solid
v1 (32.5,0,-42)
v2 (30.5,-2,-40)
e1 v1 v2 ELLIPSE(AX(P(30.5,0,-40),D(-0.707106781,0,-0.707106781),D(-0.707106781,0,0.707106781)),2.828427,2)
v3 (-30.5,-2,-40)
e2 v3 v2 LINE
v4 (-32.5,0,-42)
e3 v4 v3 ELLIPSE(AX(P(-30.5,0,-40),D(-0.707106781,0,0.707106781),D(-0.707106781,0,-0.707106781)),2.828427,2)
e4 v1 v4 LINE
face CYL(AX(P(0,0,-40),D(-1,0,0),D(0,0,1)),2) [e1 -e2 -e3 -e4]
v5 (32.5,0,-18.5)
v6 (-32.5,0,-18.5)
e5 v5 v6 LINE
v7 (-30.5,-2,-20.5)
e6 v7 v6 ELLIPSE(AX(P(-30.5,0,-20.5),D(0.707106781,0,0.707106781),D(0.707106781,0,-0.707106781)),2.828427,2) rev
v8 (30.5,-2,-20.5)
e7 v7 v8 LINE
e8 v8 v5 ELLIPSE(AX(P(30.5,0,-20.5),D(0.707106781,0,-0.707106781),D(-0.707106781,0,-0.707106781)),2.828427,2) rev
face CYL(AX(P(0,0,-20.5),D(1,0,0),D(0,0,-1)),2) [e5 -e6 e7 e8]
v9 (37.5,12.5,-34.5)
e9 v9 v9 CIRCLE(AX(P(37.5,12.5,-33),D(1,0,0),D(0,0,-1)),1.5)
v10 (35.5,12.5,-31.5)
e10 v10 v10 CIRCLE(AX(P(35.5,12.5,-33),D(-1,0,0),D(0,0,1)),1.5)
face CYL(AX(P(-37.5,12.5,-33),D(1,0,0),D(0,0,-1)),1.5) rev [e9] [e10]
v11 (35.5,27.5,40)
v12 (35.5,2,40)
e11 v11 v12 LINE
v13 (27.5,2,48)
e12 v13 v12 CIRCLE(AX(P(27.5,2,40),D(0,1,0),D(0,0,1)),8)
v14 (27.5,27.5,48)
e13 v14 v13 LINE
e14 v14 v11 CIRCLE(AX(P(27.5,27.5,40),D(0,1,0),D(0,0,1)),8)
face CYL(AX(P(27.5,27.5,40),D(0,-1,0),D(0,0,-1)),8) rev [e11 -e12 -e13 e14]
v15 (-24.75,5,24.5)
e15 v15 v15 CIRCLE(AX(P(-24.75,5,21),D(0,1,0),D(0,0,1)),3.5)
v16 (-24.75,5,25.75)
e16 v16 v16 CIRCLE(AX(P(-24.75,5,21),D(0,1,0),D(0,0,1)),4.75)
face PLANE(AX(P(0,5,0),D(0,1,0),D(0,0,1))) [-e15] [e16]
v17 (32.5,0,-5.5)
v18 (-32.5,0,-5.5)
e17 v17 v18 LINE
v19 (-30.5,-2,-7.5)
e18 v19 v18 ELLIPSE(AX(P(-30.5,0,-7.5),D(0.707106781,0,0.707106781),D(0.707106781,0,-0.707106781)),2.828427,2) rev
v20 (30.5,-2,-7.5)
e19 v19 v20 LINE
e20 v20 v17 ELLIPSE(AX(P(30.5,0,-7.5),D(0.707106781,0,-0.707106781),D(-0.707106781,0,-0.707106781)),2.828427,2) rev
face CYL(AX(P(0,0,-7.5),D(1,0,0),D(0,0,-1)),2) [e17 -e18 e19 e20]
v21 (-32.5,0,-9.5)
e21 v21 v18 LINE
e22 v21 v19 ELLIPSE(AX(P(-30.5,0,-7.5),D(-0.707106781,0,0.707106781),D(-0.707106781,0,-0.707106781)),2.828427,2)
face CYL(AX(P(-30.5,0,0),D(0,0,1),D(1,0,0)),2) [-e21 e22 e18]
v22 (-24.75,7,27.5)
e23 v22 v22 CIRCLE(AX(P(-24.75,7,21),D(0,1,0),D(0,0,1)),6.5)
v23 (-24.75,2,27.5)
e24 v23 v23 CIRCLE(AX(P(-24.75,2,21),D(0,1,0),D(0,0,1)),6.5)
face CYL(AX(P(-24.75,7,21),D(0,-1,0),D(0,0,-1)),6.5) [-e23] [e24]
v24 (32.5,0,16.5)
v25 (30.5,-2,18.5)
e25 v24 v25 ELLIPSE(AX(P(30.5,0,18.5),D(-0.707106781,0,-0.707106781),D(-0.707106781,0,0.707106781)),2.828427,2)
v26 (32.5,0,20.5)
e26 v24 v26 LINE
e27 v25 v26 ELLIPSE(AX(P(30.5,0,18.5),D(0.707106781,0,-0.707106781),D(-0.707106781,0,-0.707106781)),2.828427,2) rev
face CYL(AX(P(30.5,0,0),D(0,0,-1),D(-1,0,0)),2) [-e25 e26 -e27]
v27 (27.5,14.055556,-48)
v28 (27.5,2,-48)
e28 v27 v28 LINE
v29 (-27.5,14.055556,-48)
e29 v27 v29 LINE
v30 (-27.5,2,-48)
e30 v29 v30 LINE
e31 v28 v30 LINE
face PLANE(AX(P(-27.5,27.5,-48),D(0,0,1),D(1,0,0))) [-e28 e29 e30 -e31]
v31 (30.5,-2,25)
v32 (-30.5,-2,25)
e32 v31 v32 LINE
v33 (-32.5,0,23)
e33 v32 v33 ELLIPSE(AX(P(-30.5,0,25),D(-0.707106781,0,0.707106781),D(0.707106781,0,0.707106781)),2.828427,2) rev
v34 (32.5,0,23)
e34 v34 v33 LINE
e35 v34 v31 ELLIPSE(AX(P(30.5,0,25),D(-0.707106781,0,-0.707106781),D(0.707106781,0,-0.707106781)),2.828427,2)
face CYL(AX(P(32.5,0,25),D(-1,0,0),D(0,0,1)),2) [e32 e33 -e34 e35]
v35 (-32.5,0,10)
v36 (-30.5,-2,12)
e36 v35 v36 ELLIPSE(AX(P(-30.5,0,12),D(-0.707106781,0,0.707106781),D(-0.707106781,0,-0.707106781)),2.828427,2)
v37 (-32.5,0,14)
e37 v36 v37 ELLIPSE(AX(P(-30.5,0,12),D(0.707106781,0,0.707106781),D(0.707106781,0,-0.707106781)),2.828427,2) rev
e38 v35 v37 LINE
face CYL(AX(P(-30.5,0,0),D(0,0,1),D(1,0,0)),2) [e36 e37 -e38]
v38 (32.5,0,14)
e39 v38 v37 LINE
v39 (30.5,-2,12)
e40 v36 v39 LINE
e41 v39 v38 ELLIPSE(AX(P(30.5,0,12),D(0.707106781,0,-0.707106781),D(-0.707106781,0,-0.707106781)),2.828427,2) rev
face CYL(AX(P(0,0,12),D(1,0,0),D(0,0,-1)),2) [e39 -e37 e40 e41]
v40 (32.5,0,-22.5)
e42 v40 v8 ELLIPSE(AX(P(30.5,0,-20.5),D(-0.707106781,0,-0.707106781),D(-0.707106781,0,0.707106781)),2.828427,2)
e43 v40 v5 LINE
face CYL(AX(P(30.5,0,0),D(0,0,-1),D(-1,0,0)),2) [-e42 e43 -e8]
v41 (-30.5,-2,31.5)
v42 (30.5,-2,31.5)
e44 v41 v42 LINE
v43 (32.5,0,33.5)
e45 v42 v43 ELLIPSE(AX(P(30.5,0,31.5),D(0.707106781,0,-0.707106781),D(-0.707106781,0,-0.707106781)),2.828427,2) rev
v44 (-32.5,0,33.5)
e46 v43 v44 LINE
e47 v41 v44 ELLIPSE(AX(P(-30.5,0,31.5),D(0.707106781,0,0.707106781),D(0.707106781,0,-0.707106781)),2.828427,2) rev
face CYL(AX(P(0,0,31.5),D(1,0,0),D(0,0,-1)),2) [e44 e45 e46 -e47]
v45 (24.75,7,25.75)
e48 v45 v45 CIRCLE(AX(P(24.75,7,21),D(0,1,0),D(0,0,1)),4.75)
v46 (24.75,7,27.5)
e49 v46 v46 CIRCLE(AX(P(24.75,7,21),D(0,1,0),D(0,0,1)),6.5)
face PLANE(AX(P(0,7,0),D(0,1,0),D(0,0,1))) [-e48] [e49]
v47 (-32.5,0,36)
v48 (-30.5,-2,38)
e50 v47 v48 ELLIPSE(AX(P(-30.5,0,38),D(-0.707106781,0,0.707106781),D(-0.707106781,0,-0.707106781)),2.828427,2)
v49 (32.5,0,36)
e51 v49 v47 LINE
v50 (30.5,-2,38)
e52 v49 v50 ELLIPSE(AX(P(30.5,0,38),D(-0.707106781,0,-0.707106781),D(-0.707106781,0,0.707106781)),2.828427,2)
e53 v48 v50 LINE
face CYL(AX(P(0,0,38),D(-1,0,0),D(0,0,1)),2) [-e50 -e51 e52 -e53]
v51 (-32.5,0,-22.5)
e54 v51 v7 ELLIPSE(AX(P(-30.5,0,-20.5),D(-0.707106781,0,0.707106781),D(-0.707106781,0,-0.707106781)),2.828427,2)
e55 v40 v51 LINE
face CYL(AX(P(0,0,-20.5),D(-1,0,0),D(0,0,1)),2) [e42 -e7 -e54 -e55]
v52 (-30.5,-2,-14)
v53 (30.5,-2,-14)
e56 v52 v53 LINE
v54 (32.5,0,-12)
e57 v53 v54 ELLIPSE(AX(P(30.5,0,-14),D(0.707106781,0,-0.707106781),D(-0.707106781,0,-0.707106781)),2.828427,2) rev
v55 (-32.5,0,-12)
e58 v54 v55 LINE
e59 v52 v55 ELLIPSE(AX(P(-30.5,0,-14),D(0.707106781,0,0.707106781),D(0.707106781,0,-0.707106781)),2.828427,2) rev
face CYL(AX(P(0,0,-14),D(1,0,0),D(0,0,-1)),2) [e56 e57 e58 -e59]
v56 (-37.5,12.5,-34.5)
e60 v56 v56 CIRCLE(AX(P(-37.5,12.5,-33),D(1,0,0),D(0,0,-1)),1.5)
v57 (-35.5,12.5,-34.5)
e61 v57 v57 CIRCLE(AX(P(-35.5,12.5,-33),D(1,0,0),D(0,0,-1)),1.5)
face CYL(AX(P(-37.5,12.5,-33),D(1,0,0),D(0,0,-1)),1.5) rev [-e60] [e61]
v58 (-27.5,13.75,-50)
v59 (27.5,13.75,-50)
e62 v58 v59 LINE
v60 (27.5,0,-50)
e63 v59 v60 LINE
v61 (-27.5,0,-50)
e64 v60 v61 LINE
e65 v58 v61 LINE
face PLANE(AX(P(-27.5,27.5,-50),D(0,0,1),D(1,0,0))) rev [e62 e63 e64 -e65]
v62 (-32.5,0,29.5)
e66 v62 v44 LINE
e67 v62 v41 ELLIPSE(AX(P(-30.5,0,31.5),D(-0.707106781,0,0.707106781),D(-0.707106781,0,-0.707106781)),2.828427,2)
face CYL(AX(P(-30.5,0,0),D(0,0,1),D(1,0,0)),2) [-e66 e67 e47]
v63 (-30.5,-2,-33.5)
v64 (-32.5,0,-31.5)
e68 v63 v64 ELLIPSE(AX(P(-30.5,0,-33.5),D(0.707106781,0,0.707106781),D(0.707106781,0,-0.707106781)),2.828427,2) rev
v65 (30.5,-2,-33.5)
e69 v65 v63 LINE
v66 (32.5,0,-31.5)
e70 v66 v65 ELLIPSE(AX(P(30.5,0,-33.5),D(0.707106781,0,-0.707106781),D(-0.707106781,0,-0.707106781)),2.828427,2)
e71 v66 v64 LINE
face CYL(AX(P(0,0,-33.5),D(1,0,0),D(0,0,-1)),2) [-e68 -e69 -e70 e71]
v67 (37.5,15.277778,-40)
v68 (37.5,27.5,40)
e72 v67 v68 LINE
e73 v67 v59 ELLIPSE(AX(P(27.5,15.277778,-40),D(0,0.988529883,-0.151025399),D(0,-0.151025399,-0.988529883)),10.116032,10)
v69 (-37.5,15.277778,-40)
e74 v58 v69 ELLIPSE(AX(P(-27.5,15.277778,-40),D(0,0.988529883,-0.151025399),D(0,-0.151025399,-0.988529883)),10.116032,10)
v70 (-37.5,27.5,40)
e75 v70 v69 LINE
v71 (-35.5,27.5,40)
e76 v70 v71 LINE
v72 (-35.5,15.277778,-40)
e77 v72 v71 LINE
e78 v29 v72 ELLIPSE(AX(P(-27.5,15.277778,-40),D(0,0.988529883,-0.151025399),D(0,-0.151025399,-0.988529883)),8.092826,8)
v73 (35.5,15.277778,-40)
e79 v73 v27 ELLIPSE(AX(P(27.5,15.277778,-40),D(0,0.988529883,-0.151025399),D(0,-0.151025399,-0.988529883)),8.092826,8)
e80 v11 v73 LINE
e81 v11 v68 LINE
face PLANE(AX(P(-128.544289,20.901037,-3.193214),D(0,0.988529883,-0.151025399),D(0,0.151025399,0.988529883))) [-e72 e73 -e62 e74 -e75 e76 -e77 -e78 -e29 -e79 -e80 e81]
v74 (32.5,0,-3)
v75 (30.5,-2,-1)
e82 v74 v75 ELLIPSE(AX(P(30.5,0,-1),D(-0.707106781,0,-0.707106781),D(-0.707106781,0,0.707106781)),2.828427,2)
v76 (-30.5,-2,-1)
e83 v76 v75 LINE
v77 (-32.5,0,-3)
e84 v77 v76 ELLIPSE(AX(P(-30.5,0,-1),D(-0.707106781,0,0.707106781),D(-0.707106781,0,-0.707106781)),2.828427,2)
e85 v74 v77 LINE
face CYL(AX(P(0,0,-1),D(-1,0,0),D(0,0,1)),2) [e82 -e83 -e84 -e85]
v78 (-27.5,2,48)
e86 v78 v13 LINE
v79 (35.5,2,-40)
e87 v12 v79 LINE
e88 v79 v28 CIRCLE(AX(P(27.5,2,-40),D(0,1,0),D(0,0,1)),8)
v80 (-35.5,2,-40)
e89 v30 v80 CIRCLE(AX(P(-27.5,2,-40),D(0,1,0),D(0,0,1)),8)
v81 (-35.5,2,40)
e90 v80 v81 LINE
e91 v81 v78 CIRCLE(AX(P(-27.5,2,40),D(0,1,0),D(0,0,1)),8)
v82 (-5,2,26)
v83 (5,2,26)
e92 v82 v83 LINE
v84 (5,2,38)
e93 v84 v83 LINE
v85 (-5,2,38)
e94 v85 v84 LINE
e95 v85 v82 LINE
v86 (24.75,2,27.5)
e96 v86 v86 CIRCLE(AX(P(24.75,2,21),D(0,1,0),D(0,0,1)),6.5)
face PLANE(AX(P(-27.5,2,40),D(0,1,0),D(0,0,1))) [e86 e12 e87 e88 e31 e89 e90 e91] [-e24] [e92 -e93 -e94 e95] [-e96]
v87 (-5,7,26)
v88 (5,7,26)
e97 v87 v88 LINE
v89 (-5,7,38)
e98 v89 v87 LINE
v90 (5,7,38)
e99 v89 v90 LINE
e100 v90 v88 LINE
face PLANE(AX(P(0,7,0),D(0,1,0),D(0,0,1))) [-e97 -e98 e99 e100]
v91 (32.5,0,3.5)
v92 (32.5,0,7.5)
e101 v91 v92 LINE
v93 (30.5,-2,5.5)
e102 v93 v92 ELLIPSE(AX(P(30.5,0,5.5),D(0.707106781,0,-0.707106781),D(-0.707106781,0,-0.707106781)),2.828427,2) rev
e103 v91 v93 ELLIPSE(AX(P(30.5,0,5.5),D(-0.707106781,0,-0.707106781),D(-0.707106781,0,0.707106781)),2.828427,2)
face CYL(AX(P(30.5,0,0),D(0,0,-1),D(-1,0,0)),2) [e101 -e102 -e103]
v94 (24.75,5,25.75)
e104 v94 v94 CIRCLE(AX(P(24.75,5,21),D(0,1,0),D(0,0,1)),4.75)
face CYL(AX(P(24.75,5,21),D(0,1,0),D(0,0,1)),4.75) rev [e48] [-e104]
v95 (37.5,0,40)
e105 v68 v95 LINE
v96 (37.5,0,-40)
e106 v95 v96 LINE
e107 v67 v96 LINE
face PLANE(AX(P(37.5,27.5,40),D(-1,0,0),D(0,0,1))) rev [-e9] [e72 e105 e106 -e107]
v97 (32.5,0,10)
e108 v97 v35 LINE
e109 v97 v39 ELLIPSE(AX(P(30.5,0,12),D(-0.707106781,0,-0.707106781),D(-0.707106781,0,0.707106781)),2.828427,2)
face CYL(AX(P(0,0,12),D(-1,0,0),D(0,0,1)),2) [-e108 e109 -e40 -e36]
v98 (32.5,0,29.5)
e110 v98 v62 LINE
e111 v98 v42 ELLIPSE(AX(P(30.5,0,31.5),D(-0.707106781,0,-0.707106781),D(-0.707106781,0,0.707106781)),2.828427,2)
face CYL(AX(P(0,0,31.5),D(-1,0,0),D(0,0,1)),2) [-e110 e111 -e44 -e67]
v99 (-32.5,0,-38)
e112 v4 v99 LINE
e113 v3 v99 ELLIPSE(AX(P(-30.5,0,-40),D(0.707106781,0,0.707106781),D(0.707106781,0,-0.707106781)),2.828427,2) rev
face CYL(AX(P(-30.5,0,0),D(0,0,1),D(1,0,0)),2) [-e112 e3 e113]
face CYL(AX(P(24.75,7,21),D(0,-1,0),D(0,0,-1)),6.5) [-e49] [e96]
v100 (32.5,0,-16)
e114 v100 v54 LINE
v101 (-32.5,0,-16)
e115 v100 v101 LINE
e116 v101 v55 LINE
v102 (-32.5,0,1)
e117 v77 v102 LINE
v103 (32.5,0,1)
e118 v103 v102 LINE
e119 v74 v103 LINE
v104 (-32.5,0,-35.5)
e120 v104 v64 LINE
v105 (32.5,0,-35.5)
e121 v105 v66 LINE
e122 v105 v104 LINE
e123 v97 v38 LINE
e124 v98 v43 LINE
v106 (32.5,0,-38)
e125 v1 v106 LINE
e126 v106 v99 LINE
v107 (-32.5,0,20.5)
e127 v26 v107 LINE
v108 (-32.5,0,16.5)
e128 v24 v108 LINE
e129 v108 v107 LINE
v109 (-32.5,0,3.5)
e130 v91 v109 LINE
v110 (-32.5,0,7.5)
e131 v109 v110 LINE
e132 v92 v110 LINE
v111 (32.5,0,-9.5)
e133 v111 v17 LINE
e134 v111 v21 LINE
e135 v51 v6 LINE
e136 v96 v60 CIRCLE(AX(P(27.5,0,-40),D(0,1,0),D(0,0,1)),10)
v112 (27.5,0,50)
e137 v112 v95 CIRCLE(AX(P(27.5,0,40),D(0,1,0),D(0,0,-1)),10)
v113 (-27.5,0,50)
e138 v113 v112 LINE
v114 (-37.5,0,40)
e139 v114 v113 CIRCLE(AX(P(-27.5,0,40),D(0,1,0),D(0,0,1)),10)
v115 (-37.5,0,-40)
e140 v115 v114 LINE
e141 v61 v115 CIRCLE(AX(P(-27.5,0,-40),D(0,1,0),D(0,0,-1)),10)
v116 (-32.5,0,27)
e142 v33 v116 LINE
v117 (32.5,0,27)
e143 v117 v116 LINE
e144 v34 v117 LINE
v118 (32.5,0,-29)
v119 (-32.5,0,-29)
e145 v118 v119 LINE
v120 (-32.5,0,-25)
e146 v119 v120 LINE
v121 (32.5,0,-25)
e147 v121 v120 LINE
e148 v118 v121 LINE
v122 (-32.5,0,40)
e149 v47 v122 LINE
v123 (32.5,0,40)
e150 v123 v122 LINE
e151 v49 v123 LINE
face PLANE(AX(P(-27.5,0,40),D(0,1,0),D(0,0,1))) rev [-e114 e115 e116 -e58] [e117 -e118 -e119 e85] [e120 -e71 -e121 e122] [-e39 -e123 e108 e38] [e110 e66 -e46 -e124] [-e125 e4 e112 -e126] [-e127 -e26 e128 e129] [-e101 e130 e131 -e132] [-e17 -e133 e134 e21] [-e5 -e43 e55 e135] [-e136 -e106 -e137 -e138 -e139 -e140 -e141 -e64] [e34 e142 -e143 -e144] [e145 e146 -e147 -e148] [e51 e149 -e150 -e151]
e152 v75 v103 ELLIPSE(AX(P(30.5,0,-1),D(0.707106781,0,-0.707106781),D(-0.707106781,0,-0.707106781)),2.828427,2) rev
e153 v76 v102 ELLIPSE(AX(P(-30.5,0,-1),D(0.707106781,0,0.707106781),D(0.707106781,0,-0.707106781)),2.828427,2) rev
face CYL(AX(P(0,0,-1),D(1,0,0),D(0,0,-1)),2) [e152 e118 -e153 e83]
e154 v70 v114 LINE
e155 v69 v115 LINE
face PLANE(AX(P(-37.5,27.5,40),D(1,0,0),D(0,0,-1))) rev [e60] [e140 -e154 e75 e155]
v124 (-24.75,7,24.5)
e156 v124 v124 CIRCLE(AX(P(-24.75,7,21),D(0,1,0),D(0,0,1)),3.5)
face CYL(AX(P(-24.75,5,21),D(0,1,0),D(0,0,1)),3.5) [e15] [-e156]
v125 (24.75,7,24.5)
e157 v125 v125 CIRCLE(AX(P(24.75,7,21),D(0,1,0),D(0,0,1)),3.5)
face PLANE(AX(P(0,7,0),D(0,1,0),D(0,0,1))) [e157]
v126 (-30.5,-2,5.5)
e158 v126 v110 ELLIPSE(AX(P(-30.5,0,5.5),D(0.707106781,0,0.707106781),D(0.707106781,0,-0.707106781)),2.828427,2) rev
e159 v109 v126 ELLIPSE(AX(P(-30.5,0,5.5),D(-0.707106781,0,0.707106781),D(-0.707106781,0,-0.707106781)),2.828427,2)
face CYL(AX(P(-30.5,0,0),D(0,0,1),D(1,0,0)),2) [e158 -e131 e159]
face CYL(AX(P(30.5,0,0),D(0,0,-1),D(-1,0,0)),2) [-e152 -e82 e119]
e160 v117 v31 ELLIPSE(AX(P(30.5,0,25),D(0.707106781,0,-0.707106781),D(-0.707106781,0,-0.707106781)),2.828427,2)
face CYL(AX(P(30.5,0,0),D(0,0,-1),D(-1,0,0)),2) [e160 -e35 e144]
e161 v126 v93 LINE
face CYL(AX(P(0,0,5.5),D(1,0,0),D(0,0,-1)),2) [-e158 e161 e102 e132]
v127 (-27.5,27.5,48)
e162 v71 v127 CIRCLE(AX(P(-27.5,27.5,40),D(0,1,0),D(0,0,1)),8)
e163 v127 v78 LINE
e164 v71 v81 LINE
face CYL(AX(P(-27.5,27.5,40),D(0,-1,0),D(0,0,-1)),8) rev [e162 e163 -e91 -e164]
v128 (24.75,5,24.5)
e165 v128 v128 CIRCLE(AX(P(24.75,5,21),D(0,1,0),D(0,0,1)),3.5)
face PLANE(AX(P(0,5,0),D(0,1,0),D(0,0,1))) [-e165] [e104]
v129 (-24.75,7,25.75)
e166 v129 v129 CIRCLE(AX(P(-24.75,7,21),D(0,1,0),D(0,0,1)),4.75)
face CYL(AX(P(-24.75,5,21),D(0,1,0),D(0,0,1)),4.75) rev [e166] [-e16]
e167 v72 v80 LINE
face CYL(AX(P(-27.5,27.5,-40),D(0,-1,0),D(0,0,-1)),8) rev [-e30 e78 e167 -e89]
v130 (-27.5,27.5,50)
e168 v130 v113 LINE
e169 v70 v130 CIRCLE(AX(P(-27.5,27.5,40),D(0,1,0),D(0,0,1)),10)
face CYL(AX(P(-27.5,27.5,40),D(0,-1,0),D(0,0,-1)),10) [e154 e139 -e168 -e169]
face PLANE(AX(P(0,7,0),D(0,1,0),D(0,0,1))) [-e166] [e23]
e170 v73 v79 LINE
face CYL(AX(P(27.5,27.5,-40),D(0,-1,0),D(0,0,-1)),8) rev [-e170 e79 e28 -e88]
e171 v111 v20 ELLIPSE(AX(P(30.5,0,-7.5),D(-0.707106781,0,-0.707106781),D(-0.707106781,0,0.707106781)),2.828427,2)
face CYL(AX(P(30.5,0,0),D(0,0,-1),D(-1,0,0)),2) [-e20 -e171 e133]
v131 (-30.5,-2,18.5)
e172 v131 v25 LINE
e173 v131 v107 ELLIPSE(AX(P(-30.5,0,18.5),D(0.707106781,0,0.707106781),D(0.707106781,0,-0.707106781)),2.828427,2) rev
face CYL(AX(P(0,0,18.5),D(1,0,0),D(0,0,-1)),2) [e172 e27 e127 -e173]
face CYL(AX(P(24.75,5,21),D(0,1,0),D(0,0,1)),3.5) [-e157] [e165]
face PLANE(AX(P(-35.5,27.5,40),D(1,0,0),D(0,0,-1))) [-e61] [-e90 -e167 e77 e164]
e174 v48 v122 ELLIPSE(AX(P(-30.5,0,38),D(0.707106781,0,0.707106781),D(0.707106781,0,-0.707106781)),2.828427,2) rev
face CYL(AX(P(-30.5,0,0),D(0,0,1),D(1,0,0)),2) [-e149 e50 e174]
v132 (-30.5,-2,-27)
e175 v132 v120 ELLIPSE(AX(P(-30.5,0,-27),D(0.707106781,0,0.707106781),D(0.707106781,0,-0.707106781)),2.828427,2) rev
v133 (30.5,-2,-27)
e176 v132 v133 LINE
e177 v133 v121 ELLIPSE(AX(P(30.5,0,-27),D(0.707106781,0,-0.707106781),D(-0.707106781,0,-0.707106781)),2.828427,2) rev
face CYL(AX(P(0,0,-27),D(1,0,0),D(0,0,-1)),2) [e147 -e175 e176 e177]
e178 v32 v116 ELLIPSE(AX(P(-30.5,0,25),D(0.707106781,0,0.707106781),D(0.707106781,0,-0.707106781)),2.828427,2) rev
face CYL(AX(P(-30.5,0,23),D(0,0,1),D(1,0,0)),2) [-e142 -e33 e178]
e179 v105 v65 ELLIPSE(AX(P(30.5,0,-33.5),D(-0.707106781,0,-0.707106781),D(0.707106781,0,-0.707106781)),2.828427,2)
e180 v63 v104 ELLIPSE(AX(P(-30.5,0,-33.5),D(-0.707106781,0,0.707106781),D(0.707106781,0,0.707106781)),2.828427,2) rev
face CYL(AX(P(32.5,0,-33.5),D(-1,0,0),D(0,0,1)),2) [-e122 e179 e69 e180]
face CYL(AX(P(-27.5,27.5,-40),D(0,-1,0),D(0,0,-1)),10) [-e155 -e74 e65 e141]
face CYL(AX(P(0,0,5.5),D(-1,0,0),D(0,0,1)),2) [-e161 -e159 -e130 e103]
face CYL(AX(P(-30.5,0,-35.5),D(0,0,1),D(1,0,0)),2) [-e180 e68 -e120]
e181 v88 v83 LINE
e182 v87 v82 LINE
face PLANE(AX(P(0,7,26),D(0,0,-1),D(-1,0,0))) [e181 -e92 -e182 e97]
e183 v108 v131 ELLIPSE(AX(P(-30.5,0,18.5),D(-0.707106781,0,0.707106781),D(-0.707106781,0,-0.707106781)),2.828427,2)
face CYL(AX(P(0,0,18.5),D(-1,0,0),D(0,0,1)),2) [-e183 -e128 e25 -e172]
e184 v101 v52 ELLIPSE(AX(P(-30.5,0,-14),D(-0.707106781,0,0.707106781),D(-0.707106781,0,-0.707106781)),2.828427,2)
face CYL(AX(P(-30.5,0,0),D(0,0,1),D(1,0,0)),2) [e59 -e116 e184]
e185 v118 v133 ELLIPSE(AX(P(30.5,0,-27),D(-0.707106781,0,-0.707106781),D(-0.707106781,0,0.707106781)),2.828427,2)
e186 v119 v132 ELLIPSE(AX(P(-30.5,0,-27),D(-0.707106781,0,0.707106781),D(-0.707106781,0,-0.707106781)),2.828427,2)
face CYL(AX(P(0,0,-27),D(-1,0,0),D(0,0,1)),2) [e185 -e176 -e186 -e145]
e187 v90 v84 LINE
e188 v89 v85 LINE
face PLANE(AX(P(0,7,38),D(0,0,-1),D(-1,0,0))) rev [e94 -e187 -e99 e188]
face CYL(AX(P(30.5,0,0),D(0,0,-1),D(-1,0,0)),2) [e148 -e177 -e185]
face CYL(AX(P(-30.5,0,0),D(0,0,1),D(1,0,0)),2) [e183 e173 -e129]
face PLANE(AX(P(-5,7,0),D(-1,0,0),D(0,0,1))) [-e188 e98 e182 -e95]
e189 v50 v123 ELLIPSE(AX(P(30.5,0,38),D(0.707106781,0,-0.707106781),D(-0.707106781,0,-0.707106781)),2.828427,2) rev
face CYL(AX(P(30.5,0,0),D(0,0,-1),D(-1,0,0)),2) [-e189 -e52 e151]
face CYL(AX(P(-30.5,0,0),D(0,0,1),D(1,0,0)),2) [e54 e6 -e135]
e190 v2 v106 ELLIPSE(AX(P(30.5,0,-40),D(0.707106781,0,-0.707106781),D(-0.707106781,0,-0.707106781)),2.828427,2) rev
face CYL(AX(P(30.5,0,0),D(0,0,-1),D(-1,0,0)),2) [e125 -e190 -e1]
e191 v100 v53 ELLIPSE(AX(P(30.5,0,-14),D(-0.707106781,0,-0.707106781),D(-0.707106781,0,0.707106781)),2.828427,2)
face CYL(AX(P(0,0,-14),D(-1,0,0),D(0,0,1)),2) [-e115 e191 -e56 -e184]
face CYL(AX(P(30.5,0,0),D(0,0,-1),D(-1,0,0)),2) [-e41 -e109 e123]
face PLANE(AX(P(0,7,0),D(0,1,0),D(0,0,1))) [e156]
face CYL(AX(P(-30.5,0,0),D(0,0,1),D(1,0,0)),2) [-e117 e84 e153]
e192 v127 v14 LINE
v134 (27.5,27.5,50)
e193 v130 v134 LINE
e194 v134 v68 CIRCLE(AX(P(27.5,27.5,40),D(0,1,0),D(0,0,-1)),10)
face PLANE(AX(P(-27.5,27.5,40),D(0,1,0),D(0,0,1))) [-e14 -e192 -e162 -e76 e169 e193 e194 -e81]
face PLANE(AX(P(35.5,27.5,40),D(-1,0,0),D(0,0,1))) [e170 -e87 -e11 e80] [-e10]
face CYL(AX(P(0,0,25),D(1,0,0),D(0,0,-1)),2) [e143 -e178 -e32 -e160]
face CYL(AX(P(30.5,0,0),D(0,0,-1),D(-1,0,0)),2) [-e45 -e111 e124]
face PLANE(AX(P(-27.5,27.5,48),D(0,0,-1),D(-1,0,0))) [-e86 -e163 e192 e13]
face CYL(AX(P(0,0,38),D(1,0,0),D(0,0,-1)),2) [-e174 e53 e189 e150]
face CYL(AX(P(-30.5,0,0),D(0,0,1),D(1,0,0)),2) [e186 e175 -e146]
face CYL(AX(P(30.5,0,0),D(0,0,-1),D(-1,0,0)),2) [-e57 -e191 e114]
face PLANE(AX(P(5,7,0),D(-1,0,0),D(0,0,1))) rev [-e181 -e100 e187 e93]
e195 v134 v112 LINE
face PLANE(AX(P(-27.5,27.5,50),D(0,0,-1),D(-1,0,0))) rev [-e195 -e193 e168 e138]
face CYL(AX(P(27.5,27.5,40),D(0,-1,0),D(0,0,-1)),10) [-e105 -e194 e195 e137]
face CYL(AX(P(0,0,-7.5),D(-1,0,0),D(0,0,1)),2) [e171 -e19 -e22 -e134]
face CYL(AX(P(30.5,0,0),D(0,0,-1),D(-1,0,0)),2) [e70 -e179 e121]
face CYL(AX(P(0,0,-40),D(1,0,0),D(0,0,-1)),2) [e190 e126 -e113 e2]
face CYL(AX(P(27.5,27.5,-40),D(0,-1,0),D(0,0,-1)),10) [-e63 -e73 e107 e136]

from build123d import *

# Parameters (mm, degrees)
BOSS_EXTRUDE1_DEPTH = 27.5
SKETCH2_W           = 65
SKETCH2_H           = 4
BOSS_EXTRUDE2_DEPTH = 2
FILLET1_R           = 2
SHELL1_START        = 2
SHELL1_DEPTH        = 25.5
CUT_EXTRUDE1_REACH  = 96.24
SKETCH5_W           = 10
SKETCH5_H           = 12
BOSS_EXTRUDE3_DEPTH = 5
SKETCH7_R           = 6.5
BOSS_EXTRUDE4_DEPTH = 5
SKETCH8_R           = 4.75
SKETCH8_R_2         = 3.5
CUT_EXTRUDE2_DEPTH  = 2
SKETCH9_R           = 1.5
CUT_EXTRUDE3_DEPTH  = 95.240384125


# Read off the part's stored shape, not the designer's step: Shell1
with BuildPart() as part:
    # Sketch1 → Boss-Extrude1 (new body)
    with BuildSketch(Plane(origin=(0, 0, 0), x_dir=(1, 0, 0), z_dir=(0, 1, 0))):
        with BuildLine():
            Line((-27.5, -50), (27.5, -50))
            ThreePointArc((27.5, -50), (34.571067812, -47.071067812), (37.5, -40))
            Line((37.5, -40), (37.5, 40))
            ThreePointArc((37.5, 40), (34.571067812, 47.071067812), (27.5, 50))
            Line((27.5, 50), (-27.5, 50))
            ThreePointArc((-27.5, 50), (-34.571067812, 47.071067812), (-37.5, 40))
            Line((-37.5, 40), (-37.5, -40))
            ThreePointArc((-37.5, -40), (-34.571067812, -47.071067812), (-27.5, -50))
        make_face()
    extrude(amount=BOSS_EXTRUDE1_DEPTH)

    # Sketch2 → Boss-Extrude2 (add)
    with BuildSketch(Plane.XZ):
        with Locations((0, -40)):
            Rectangle(SKETCH2_W, SKETCH2_H)
        with Locations((0, -33.5)):
            Rectangle(SKETCH2_W, SKETCH2_H)
        with Locations((0, -27)):
            Rectangle(SKETCH2_W, SKETCH2_H)
        with Locations((0, -20.5)):
            Rectangle(SKETCH2_W, SKETCH2_H)
        with Locations((0, -14)):
            Rectangle(SKETCH2_W, SKETCH2_H)
        with Locations((0, -7.5)):
            Rectangle(SKETCH2_W, SKETCH2_H)
        with Locations((0, -1)):
            Rectangle(SKETCH2_W, SKETCH2_H)
        with Locations((0, 5.5)):
            Rectangle(SKETCH2_W, SKETCH2_H)
        with Locations((0, 12)):
            Rectangle(SKETCH2_W, SKETCH2_H)
        with Locations((0, 18.5)):
            Rectangle(SKETCH2_W, SKETCH2_H)
        with Locations((0, 25)):
            Rectangle(SKETCH2_W, SKETCH2_H)
        with Locations((0, 31.5)):
            Rectangle(SKETCH2_W, SKETCH2_H)
        with Locations((0, 38)):
            Rectangle(SKETCH2_W, SKETCH2_H)
    extrude(amount=BOSS_EXTRUDE2_DEPTH)

    # Fillet1
    fillet1_edges = [part.edges().sort_by_distance(p)[0] for p in [
        (-32.5, -2, 38),
        (0, -2, 40),
        (32.5, -2, 38),
        (0, -2, 36),
        (-32.5, -2, 31.5),
        (0, -2, 33.5),
        (32.5, -2, 31.5),
        (0, -2, 29.5),
        (-32.5, -2, 12),
        (0, -2, 14),
        (32.5, -2, 12),
        (0, -2, 10),
        (-32.5, -2, 18.5),
        (0, -2, 20.5),
        (32.5, -2, 18.5),
        (0, -2, 16.5),
        (-32.5, -2, -40),
        (0, -2, -38),
        (32.5, -2, -40),
        (0, -2, -42),
        (0, -2, -35.5),
        (-32.5, -2, -33.5),
        (0, -2, -31.5),
        (32.5, -2, -33.5),
        (-32.5, -2, -27),
        (0, -2, -25),
        (32.5, -2, -27),
        (0, -2, -29),
        (-32.5, -2, -20.5),
        (0, -2, -18.5),
        (32.5, -2, -20.5),
        (0, -2, -22.5),
        (-32.5, -2, -14),
        (0, -2, -12),
        (32.5, -2, -14),
        (0, -2, -16),
        (-32.5, -2, -7.5),
        (0, -2, -5.5),
        (32.5, -2, -7.5),
        (0, -2, -9.5),
        (-32.5, -2, -1),
        (0, -2, 1),
        (32.5, -2, -1),
        (0, -2, -3),
        (-32.5, -2, 5.5),
        (0, -2, 7.5),
        (32.5, -2, 5.5),
        (0, -2, 3.5),
        (0, -2, 23),
        (-32.5, -2, 25),
        (0, -2, 27),
        (32.5, -2, 25),
    ]]
    fillet(fillet1_edges, radius=FILLET1_R - 0.0001)  # a hair under: the kernel refuses the full size

    # Shell1 outline → Shell1 (cut)
    with BuildSketch(Plane(origin=(0, 0, 0), x_dir=(1, 0, 0), z_dir=(0, 1, 0)).offset(SHELL1_START)):
        with BuildLine():
            ThreePointArc((-35.5, -40), (-33.156854249, -45.656854249), (-27.5, -48))
            Line((-27.5, -48), (27.5, -48))
            ThreePointArc((27.5, -48), (33.156854249, -45.656854249), (35.5, -40))
            Line((35.5, -40), (35.5, 40))
            ThreePointArc((35.5, 40), (33.156854249, 45.656854249), (27.5, 48))
            Line((27.5, 48), (-27.5, 48))
            ThreePointArc((-27.5, 48), (-33.156854249, 45.656854249), (-35.5, 40))
            Line((-35.5, 40), (-35.5, -40))
        make_face()
    extrude(amount=SHELL1_DEPTH, mode=Mode.SUBTRACT)

    # Cut-Extrude1: up to this face of the body (flat: up to its plane)
    cut_extrude1_end = Plane(part.part.faces().sort_by_distance((-37.5, 13.75, 0))[0])
    # Sketch4 → Cut-Extrude1 (cut, up to the picked face)
    with BuildSketch(Plane(origin=(37.5, 0, 0), x_dir=(0, 0, -1), z_dir=(1, 0, 0)), mode=Mode.PRIVATE) as cut_extrude1_sk1:
        Polygon((40, 27.5), (-40, 27.5), (50, 13.75), (50, 27.5), align=None)
    cut_extrude1_tool1 = split(extrude(cut_extrude1_sk1.sketch, amount=-CUT_EXTRUDE1_REACH, mode=Mode.PRIVATE), bisect_by=cut_extrude1_end, keep=Keep.BOTH, mode=Mode.PRIVATE)
    add(cut_extrude1_tool1.solids().sort_by(Axis((37.5, 22.916667, -20), (-1, 0, 0)))[0], mode=Mode.SUBTRACT)

    # Sketch5 → Boss-Extrude3 (add)
    with BuildSketch(Plane(origin=(0, 2, 0), x_dir=(1, 0, 0), z_dir=(0, 1, 0))):
        with Locations((0, -32)):
            Rectangle(SKETCH5_W, SKETCH5_H)
    extrude(amount=BOSS_EXTRUDE3_DEPTH)

    # Sketch7 → Boss-Extrude4 (add)
    with BuildSketch(Plane(origin=(0, 2, 0), x_dir=(1, 0, 0), z_dir=(0, 1, 0))):
        with Locations(Location((-24.75, -21, 0), (0, 0, 270))):
            Circle(SKETCH7_R)
        with Locations(Location((24.75, -21, 0), (0, 0, 270))):
            Circle(SKETCH7_R)
    extrude(amount=BOSS_EXTRUDE4_DEPTH)

    # Sketch8 → Cut-Extrude2 (cut)
    # profile 1 of 2: a face of its own
    with BuildSketch(Plane(origin=(0, 7, 0), x_dir=(1, 0, 0), z_dir=(0, 1, 0))):
        with Locations(Location((-24.75, -21, 0), (0, 0, 270))):
            Circle(SKETCH8_R)
        with Locations(Location((-24.75, -21, 0), (0, 0, 270))):
            Circle(SKETCH8_R_2, mode=Mode.SUBTRACT)
    # profile 2 of 2: a face of its own
    with BuildSketch(Plane(origin=(0, 7, 0), x_dir=(1, 0, 0), z_dir=(0, 1, 0))):
        with Locations(Location((24.75, -21, 0), (0, 0, 270))):
            Circle(SKETCH8_R)
        with Locations(Location((24.75, -21, 0), (0, 0, 270))):
            Circle(SKETCH8_R_2, mode=Mode.SUBTRACT)
    extrude(amount=-CUT_EXTRUDE2_DEPTH, mode=Mode.SUBTRACT)

    # Sketch9 → Cut-Extrude3 (cut, through all)
    with BuildSketch(Plane(origin=(37.5, 0, 0), x_dir=(0, 0, -1), z_dir=(1, 0, 0))):
        with Locations((33, 12.5)):
            Circle(SKETCH9_R)
    extrude(amount=-CUT_EXTRUDE3_DEPTH, mode=Mode.SUBTRACT)


solid = part.part
